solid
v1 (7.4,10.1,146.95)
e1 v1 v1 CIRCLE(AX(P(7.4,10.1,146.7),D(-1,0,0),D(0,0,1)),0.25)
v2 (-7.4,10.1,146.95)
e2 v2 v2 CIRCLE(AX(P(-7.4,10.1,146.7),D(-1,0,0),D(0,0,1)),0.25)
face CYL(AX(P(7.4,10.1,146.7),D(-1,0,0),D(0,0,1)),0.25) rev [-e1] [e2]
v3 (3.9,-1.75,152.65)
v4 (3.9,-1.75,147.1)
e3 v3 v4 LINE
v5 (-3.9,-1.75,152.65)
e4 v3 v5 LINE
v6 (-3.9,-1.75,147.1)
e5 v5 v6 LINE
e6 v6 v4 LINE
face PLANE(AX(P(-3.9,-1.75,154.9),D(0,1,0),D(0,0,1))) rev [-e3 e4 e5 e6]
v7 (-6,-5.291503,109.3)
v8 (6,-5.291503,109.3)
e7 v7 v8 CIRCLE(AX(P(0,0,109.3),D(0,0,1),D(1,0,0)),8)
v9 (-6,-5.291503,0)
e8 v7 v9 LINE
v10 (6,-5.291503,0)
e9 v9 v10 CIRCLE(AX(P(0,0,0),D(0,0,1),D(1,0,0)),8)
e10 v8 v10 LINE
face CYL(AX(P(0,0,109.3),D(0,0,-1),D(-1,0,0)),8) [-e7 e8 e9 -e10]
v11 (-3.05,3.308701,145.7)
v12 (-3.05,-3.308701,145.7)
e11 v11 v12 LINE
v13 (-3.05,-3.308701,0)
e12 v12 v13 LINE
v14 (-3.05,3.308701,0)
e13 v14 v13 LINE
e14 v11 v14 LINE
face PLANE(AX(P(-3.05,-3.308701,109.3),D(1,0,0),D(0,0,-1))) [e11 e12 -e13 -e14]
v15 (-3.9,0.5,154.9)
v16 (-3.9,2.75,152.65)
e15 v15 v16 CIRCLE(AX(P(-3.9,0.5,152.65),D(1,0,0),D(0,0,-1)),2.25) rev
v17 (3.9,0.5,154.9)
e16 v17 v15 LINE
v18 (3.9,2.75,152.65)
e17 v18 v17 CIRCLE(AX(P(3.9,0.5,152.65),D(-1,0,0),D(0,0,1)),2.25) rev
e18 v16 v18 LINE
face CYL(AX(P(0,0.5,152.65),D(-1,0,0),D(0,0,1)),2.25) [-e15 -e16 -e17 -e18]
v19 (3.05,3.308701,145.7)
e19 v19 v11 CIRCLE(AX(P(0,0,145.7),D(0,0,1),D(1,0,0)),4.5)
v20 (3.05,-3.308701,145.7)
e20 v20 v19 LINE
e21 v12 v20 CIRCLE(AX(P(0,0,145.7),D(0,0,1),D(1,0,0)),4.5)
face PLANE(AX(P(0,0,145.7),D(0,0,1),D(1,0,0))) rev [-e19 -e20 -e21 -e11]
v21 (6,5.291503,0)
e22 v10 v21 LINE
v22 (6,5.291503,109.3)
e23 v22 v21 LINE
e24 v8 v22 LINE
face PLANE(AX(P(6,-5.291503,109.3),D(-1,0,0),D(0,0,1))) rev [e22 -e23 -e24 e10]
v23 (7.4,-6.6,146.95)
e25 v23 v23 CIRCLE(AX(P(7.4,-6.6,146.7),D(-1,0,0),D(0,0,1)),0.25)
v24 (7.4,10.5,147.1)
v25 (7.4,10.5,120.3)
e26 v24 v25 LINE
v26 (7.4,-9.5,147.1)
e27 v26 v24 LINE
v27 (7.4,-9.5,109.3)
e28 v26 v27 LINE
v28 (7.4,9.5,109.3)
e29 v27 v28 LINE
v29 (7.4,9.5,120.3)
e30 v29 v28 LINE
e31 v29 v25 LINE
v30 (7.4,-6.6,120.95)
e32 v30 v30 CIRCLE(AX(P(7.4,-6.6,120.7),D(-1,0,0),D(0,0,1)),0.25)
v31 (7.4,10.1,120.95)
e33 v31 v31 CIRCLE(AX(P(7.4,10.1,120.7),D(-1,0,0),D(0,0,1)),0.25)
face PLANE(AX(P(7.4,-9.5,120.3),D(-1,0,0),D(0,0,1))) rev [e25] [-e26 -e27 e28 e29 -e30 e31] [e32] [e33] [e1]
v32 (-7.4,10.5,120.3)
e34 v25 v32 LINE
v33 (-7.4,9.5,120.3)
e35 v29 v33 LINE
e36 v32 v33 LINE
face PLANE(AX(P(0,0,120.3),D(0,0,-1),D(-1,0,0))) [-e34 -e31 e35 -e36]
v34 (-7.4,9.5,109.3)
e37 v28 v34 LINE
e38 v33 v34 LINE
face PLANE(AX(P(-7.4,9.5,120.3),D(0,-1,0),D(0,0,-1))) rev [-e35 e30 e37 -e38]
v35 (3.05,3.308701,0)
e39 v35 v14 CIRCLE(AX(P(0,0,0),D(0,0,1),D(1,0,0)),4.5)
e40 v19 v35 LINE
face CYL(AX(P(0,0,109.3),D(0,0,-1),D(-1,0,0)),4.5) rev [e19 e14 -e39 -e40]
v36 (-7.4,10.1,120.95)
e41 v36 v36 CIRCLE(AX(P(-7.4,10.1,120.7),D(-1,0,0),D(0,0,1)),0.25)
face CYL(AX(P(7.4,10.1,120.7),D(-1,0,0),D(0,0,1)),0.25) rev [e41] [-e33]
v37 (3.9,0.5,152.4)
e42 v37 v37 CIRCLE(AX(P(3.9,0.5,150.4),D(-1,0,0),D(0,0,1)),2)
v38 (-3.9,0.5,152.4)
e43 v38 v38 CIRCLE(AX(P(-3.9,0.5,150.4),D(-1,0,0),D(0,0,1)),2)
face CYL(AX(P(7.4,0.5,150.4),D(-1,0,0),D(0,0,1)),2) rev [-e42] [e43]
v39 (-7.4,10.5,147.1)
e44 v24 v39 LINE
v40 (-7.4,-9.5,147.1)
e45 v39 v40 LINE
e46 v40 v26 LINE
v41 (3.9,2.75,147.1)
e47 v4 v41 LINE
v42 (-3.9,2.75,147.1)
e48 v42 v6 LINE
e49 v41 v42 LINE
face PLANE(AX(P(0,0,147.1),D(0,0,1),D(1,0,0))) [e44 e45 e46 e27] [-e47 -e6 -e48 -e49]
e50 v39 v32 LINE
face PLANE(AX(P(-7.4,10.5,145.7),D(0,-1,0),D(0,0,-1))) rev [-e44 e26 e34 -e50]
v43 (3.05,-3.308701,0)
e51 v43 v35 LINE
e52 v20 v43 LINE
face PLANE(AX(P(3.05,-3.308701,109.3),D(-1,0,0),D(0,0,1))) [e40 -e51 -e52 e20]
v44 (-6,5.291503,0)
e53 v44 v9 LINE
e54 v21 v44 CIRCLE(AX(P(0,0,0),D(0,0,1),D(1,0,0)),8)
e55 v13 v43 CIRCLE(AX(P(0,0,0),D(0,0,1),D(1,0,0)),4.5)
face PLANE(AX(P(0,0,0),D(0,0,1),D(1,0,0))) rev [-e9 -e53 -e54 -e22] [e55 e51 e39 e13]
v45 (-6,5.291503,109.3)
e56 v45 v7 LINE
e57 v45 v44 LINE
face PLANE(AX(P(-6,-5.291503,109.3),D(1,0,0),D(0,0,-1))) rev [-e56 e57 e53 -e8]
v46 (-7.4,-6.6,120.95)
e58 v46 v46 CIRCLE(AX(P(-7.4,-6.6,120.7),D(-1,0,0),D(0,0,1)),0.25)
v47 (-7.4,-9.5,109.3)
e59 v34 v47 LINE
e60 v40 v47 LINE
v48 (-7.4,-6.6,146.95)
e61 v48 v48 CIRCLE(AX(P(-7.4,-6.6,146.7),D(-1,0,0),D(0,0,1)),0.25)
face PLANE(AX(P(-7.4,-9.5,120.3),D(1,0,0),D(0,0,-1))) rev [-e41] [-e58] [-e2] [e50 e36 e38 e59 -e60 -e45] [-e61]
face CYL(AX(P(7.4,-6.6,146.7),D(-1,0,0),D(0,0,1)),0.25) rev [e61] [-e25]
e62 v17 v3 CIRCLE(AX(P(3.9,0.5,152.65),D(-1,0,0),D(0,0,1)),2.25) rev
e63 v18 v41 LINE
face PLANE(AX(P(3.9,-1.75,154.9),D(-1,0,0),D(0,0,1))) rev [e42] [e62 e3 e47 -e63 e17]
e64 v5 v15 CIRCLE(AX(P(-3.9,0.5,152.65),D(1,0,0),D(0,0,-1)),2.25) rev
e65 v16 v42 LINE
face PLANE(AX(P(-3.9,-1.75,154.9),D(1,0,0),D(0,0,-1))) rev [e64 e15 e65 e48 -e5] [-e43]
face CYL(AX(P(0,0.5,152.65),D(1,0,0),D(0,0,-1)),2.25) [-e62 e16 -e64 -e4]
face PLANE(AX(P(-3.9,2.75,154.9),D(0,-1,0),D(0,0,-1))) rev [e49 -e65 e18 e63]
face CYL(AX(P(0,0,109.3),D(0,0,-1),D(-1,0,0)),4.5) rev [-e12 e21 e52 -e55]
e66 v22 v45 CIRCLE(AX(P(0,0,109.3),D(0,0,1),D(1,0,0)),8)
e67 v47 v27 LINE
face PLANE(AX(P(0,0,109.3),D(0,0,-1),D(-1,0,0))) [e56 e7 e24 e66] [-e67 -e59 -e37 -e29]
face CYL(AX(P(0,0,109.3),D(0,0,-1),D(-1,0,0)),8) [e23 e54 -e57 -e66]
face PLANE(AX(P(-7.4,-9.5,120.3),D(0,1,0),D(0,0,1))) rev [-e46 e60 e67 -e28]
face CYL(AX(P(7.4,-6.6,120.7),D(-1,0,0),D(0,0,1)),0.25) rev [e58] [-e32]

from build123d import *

# Parameters (mm, degrees)
BOSS_EXTRUDE2_DEPTH = 109.3
SKETCH4_W           = 14.8
SKETCH4_H           = 19
BOSS_EXTRUDE3_DEPTH = 11
SKETCH5_W           = 14.8
SKETCH5_H           = 20
BOSS_EXTRUDE4_DEPTH = 25.4
SKETCH7_W           = 14.8
SKETCH7_H           = 20
BOSS_EXTRUDE5_DEPTH = 1.4
SKETCH8_W           = 7.8
SKETCH8_H           = 4.5
BOSS_EXTRUDE6_DEPTH = 7.8
SKETCH9_R           = 2
CUT_EXTRUDE1_DEPTH  = 156.666149178
FILLET1_R           = 2.25
SKETCH10_R          = 0.25
CUT_EXTRUDE2_DEPTH  = 156.95928956


with BuildPart() as part:
    # Sketch3 → Boss-Extrude2 (new body)
    with BuildSketch(Plane.XY):
        with BuildLine():
            Line((-6, -5.291502622), (-6, 5.291502622))
            ThreePointArc((-6, 5.291502622), (0, 8), (6, 5.291502622))
            Line((6, 5.291502622), (6, -5.291502622))
            ThreePointArc((6, -5.291502622), (0, -8), (-6, -5.291502622))
        make_face()
        with BuildLine():
            Line((-3.05, -3.308700651), (-3.05, 3.308700651))
            ThreePointArc((-3.05, 3.308700651), (0, 4.5), (3.05, 3.308700651))
            Line((3.05, 3.308700651), (3.05, -3.308700651))
            ThreePointArc((3.05, -3.308700651), (0, -4.5), (-3.05, -3.308700651))
        make_face(mode=Mode.SUBTRACT)
    extrude(amount=BOSS_EXTRUDE2_DEPTH)

    # Sketch4 → Boss-Extrude3 (add)
    with BuildSketch(Plane.XY.offset(109.3)):
        Rectangle(SKETCH4_W, SKETCH4_H)
        with BuildLine():
            Line((-3.05, 3.308700651), (-3.05, -3.308700651))
            ThreePointArc((-3.05, -3.308700651), (0, -4.5), (3.05, -3.308700651))
            Line((3.05, -3.308700651), (3.05, 3.308700651))
            ThreePointArc((3.05, 3.308700651), (0, 4.5), (-3.05, 3.308700651))
        make_face(mode=Mode.SUBTRACT)
    extrude(amount=BOSS_EXTRUDE3_DEPTH)

    # Sketch5 → Boss-Extrude4 (add)
    with BuildSketch(Plane.XY.offset(120.3)):
        with Locations((0, 0.5)):
            Rectangle(SKETCH5_W, SKETCH5_H)
        with BuildLine():
            Line((-3.05, 3.308700651), (-3.05, -3.308700651))
            ThreePointArc((-3.05, -3.308700651), (0, -4.5), (3.05, -3.308700651))
            Line((3.05, -3.308700651), (3.05, 3.308700651))
            ThreePointArc((3.05, 3.308700651), (0, 4.5), (-3.05, 3.308700651))
        make_face(mode=Mode.SUBTRACT)
    extrude(amount=BOSS_EXTRUDE4_DEPTH)

    # Sketch7 → Boss-Extrude5 (add)
    with BuildSketch(Plane.XY.offset(145.7)):
        with Locations((0, 0.5)):
            Rectangle(SKETCH7_W, SKETCH7_H)
    extrude(amount=BOSS_EXTRUDE5_DEPTH)

    # Sketch8 → Boss-Extrude6 (add)
    with BuildSketch(Plane.XY.offset(147.1)):
        with Locations((0, 0.5)):
            Rectangle(SKETCH8_W, SKETCH8_H)
    extrude(amount=BOSS_EXTRUDE6_DEPTH)

    # Sketch9 → Cut-Extrude1 (cut, through all)
    with BuildSketch(Plane.ZY.offset(3.9)):
        with Locations((150.4, 0.5)):
            Circle(SKETCH9_R)
    extrude(amount=-CUT_EXTRUDE1_DEPTH, mode=Mode.SUBTRACT)

    # Fillet1
    fillet1_edges = [part.edges().sort_by_distance(p)[0] for p in [
        (0, -1.75, 154.9),
        (0, 2.75, 154.9),
    ]]
    fillet(fillet1_edges, radius=FILLET1_R - 0.0001)  # a hair under: the kernel refuses the full size

    # Sketch10 → Cut-Extrude2 (cut, through all)
    with BuildSketch(Plane.ZY.offset(7.4)):
        with Locations((120.7, -6.6)):
            Circle(SKETCH10_R)
        with Locations((146.7, -6.6)):
            Circle(SKETCH10_R)
        with Locations((120.7, 10.1)):
            Circle(SKETCH10_R)
        with Locations((146.7, 10.1)):
            Circle(SKETCH10_R)
    extrude(amount=-CUT_EXTRUDE2_DEPTH, mode=Mode.SUBTRACT)


solid = part.part
